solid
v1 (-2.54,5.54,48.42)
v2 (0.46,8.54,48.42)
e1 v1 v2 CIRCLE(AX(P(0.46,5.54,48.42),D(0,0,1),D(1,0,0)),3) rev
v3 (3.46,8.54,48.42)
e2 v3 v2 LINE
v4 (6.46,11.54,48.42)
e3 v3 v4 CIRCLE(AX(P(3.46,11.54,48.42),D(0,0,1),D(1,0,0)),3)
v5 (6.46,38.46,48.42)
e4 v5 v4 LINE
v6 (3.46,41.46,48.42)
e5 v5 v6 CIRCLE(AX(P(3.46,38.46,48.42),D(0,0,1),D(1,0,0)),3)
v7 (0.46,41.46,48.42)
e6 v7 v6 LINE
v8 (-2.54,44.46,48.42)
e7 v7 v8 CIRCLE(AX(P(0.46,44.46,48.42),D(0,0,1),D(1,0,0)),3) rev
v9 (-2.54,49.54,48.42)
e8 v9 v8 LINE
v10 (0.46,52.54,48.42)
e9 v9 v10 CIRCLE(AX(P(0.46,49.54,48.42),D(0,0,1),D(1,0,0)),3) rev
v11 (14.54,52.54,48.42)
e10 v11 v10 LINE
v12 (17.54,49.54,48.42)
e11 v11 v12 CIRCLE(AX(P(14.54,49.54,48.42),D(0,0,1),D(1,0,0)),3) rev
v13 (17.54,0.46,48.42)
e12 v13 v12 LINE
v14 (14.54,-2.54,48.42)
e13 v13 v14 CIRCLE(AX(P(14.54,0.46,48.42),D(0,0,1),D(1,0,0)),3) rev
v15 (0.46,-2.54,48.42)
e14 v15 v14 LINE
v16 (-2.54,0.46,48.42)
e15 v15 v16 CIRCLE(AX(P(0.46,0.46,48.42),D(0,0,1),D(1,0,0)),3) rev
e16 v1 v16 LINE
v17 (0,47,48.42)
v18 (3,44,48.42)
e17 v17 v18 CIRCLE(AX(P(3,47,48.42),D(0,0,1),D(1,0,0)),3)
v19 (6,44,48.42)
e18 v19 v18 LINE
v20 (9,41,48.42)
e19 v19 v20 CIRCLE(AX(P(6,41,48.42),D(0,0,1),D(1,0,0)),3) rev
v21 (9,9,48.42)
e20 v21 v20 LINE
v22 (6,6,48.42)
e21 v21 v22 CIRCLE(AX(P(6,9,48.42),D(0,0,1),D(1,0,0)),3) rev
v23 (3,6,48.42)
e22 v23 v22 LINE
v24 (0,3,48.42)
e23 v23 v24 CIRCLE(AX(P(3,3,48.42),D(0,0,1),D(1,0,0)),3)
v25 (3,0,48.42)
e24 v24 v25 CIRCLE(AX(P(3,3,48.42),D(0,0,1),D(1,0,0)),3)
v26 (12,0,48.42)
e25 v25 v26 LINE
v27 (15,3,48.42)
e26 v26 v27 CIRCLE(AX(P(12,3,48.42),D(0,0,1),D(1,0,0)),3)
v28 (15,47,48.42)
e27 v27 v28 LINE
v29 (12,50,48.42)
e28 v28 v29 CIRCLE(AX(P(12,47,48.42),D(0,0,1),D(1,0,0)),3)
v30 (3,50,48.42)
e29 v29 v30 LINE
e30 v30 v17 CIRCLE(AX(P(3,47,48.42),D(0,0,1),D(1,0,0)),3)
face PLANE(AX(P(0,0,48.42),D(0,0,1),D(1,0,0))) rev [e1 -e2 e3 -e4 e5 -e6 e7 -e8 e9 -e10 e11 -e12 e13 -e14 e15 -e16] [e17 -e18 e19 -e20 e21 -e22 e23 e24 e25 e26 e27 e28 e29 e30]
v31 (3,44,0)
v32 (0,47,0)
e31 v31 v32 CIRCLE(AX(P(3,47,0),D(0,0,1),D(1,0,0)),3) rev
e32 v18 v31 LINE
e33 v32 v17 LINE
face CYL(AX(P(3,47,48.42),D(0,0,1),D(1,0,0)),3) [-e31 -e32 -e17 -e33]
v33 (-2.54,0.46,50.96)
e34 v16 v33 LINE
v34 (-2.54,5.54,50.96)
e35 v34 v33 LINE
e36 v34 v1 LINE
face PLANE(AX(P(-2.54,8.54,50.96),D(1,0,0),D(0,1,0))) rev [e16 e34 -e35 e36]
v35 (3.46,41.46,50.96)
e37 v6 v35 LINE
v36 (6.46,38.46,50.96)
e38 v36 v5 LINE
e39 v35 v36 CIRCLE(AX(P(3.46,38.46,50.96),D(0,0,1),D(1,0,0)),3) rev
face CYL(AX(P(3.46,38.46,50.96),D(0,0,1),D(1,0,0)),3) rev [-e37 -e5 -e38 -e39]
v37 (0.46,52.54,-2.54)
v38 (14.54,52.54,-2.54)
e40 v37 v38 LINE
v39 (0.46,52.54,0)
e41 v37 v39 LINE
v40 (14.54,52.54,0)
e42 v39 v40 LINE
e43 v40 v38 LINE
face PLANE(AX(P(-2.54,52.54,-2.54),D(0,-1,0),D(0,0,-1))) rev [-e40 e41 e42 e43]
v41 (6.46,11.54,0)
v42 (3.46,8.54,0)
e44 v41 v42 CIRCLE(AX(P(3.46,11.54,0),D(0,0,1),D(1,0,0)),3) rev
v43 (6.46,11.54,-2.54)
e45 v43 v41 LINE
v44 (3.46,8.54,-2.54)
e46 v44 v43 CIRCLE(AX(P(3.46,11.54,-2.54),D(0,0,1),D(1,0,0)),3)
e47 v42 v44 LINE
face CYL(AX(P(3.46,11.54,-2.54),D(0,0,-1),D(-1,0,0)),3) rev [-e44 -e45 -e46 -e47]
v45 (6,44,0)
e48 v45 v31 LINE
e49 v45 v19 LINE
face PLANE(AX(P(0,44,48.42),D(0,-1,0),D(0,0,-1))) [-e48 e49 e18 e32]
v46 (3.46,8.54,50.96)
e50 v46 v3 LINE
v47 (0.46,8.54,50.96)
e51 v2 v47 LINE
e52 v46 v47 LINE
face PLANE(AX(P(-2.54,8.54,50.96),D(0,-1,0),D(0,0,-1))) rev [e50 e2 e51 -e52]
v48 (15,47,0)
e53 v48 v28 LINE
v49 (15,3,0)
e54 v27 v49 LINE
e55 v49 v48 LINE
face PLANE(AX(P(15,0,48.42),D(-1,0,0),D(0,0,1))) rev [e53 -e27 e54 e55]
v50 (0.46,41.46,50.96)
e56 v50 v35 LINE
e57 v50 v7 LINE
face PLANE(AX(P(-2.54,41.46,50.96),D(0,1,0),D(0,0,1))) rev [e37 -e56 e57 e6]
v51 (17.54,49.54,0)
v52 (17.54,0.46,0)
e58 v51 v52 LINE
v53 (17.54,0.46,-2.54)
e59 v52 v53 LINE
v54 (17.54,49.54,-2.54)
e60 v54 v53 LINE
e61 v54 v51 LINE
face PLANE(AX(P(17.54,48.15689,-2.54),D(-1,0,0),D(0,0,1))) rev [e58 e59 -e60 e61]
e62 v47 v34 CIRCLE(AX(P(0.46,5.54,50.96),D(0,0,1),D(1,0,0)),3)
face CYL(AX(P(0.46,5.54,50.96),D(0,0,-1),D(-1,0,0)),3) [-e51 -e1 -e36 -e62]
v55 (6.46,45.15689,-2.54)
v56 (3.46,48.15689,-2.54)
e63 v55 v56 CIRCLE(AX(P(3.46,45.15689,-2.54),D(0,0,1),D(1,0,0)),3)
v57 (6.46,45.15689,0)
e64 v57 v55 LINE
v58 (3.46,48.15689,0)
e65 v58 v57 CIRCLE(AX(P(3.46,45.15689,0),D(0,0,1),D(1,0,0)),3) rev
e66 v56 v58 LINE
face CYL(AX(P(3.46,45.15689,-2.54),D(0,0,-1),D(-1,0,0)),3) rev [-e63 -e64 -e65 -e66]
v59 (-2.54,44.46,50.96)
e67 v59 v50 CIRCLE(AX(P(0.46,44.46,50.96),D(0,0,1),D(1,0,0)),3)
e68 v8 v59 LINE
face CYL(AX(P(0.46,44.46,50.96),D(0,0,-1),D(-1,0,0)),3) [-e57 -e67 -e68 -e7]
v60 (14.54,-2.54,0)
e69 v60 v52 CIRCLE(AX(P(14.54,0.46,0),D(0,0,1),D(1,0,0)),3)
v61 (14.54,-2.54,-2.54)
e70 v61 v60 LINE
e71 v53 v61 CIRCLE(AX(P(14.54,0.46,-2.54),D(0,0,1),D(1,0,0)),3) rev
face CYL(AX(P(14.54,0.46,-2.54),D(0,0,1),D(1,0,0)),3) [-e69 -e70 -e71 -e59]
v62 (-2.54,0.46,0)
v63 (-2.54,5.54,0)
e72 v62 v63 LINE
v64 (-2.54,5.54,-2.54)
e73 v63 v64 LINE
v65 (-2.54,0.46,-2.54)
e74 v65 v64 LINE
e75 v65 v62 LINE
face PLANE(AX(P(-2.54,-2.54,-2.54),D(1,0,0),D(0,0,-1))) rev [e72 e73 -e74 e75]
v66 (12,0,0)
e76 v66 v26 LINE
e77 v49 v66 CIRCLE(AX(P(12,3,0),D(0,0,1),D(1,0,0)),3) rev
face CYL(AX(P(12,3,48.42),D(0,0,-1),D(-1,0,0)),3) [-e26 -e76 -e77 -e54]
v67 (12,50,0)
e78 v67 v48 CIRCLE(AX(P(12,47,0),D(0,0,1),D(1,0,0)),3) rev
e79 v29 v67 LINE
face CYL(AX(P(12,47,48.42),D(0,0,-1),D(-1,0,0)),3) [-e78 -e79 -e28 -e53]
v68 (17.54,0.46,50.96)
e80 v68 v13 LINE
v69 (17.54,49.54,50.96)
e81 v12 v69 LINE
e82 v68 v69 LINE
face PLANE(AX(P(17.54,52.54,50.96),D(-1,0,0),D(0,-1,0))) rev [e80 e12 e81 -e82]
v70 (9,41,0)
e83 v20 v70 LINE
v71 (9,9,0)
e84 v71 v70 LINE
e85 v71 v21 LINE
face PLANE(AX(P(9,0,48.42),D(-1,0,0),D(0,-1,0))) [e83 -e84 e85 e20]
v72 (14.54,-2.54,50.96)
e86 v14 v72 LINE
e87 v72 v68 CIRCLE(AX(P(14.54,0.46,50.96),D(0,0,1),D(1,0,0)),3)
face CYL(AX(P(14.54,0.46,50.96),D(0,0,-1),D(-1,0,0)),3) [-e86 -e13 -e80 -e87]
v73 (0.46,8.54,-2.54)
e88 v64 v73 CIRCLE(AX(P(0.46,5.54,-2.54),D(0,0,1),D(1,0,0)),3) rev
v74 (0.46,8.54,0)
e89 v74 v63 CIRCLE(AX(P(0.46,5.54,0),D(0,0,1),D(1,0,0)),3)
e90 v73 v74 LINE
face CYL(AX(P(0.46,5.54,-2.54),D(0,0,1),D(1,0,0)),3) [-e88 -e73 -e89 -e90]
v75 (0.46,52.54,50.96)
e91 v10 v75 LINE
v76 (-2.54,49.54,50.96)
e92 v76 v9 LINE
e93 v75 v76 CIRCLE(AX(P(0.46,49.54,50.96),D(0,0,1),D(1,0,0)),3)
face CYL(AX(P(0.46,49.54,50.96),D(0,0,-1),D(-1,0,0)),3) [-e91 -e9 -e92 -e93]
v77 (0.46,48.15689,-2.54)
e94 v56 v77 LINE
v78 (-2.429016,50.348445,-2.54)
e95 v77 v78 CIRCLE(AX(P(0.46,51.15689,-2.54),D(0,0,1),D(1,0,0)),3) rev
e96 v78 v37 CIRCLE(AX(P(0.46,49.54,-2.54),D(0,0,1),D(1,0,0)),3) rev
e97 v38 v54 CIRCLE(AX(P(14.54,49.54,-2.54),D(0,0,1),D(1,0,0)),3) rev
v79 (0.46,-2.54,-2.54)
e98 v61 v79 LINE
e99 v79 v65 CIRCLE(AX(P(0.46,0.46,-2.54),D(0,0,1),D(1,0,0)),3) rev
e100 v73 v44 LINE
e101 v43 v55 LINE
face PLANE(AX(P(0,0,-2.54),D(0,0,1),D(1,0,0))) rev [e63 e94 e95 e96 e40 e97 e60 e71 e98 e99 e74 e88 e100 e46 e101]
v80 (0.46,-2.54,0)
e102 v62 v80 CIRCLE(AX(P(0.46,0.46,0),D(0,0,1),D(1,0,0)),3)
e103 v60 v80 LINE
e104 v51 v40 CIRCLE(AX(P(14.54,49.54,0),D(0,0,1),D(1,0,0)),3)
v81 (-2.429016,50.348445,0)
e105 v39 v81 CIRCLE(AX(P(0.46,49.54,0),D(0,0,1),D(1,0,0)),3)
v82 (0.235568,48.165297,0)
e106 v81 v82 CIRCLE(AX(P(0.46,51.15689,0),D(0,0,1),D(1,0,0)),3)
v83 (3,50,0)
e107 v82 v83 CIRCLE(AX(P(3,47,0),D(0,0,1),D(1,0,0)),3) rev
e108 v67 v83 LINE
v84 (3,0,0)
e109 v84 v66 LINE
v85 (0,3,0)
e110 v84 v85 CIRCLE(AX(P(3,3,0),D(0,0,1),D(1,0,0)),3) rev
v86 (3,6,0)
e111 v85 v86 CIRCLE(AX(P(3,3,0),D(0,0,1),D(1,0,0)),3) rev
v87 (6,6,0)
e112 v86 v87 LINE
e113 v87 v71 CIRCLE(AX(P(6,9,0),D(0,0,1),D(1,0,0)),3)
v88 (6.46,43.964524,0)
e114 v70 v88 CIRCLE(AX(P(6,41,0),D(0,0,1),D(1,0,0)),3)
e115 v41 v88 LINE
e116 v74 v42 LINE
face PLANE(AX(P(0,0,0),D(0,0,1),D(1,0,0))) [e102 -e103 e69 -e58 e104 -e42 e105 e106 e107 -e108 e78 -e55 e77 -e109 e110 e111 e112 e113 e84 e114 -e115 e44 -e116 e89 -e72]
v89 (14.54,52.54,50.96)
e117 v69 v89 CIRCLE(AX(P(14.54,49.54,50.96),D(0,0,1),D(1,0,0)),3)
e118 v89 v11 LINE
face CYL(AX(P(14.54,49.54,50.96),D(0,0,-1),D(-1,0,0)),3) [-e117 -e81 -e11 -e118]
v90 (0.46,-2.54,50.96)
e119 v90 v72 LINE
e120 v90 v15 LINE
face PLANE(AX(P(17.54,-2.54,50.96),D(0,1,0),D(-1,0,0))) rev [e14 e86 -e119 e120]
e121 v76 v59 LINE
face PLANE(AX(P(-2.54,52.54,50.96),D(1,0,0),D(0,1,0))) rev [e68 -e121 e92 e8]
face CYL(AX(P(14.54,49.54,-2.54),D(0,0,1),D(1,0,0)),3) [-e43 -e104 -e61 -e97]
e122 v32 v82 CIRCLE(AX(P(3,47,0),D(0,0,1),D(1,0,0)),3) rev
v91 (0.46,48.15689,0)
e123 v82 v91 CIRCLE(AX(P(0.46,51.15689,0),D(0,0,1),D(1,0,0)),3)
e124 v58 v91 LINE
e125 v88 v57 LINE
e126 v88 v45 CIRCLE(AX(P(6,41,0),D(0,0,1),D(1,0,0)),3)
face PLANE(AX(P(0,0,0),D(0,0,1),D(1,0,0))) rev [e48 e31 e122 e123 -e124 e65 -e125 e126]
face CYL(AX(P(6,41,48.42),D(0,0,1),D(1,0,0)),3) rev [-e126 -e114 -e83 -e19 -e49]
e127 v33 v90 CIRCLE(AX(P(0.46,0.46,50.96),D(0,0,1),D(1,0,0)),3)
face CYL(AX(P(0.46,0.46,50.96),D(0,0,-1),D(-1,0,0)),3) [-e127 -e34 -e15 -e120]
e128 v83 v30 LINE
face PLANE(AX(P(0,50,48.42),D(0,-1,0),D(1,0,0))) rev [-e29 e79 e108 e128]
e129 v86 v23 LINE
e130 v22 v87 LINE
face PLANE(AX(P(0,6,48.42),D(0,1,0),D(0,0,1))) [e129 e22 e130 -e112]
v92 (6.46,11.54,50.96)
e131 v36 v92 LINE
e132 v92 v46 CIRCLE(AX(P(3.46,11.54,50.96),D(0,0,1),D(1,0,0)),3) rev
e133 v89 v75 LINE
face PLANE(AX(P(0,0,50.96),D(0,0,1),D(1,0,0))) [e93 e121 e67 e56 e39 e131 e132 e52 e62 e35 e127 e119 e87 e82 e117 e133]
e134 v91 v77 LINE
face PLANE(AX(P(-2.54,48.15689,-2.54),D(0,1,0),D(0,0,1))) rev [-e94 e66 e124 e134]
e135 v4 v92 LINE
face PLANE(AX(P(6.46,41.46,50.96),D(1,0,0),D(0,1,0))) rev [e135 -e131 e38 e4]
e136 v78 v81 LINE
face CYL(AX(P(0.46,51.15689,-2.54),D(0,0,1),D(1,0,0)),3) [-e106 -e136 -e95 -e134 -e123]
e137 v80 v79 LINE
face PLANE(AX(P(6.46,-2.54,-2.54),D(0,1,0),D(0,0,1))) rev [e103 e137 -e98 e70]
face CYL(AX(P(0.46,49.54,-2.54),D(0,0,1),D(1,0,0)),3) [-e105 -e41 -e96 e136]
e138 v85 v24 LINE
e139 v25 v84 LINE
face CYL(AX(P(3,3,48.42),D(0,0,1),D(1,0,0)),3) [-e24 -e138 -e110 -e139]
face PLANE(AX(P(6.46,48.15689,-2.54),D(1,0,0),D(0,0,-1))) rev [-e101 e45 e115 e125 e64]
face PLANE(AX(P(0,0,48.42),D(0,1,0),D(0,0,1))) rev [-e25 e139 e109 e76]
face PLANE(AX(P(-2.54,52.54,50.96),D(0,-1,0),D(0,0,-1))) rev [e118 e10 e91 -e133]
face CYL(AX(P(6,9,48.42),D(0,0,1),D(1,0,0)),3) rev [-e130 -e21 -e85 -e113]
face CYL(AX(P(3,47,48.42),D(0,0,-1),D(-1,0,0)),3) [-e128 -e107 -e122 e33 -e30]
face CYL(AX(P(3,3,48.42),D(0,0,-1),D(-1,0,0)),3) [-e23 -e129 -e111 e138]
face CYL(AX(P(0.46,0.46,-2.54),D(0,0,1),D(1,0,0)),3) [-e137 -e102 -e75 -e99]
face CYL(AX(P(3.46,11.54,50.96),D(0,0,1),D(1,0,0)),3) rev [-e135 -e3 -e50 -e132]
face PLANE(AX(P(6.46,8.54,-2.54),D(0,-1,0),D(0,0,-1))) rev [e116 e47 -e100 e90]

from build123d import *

# Parameters (mm, degrees)
BOSS_EXTRUDE1_DEPTH = 48.42
BOSS_EXTRUDE2_DEPTH = 2.54
BOSS_EXTRUDE3_DEPTH = 2.54
FILLET4_R           = 3
FILLET5_R           = 3


with BuildPart() as part:
    # Sketch1 → Boss-Extrude1 (new body)
    with BuildSketch(Plane.XY):
        Polygon((0, 6), (0, 0), (15, 0), (15, 46.604118993), (15, 50), (0, 50), (0, 44), (9, 44), (9, 6), align=None)
    extrude(amount=BOSS_EXTRUDE1_DEPTH)

    # Sketch2 → Boss-Extrude2 (add)
    with BuildSketch(Plane.XY.offset(48.42)):
        Polygon((-2.54, 41.46), (6.46, 41.46), (6.46, 8.54), (-2.54, 8.54), (-2.54, -2.54), (17.54, -2.54), (17.54, 52.54), (-2.54, 52.54), align=None)
    extrude(amount=BOSS_EXTRUDE2_DEPTH)

    # Sketch3 → Boss-Extrude3 (add)
    with BuildSketch(Plane(origin=(0, 0, 0), x_dir=(-1, 0, 0), z_dir=(0, 0, -1))):
        Polygon((2.54, 52.54), (-17.54, 52.54), (-17.54, 48.156890446), (-17.54, -2.54), (-6.46, -2.54), (2.54, -2.54), (2.54, 8.54), (-6.46, 8.54), (-6.46, 48.156890446), (2.54, 48.156890446), align=None)
    extrude(amount=BOSS_EXTRUDE3_DEPTH)

    # Fillet4
    # the kernel refuses this fillet: 3 mm, written as the material it adds along each edge
    with BuildSketch(Plane(origin=(9, 6, -7.5), x_dir=(0, 1, 0), z_dir=(0, 0, 1))) as fillet4_piece_1_section:
        with BuildLine():
            CenterArc((FILLET4_R, FILLET4_R), FILLET4_R, 180, 90)
            Line((0, FILLET4_R), (0, 0))
            Line((0, 0), (FILLET4_R, 0))
        make_face()
    fillet4_piece_1 = extrude(amount=63.42, mode=Mode.PRIVATE)
    fillet4_piece_1 = split(fillet4_piece_1, bisect_by=Plane(origin=(8.329896183, 6.670103817, 50.96), z_dir=(0, 0, -1)), keep=Keep.TOP, mode=Mode.PRIVATE)
    fillet4_piece_1 = split(fillet4_piece_1, bisect_by=Plane(origin=(8.329896183, 6.670103817, -2.54), z_dir=(0, 0, 1)), keep=Keep.TOP, mode=Mode.PRIVATE)
    add(fillet4_piece_1)
    with BuildSketch(Plane(origin=(9, 44, 0), x_dir=(-1, 0, 0), z_dir=(0, 0, 1))) as fillet4_piece_2_section:
        with BuildLine():
            CenterArc((FILLET4_R, FILLET4_R), FILLET4_R, 180, 90)
            Line((0, FILLET4_R), (0, 0))
            Line((0, 0), (FILLET4_R, 0))
        make_face()
    fillet4_piece_2 = extrude(amount=55.92, mode=Mode.PRIVATE)
    fillet4_piece_2 = split(fillet4_piece_2, bisect_by=Plane(origin=(6.34513643, 43.989367947, 50.96), z_dir=(0, 0, -1)), keep=Keep.TOP, mode=Mode.PRIVATE)
    add(fillet4_piece_2)
    # the kernel refuses this fillet: 3 mm, written as the material it takes off along each edge
    with BuildSketch(Plane(origin=(0, 6, 0), x_dir=(0, -1, 0), z_dir=(0, 0, 1)), Plane(origin=(15, 0, 0), x_dir=(0, 1, 0), z_dir=(0, 0, 1)), Plane(origin=(0, 0, 0), x_dir=(1, 0, 0), z_dir=(0, 0, 1)), Plane(origin=(0, 50, 0), x_dir=(0, -1, 0), z_dir=(0, 0, 1))) as fillet4_2_piece_1:
        with BuildLine():
            CenterArc((FILLET4_R, FILLET4_R), FILLET4_R, 180, 90)
            Line((0, FILLET4_R), (0, 0))
            Line((0, 0), (FILLET4_R, 0))
        make_face()
    extrude(amount=48.42, mode=Mode.SUBTRACT)
    with BuildSketch(Plane(origin=(15, 50, 0), x_dir=(0, -1, 0), z_dir=(0, 0, 1))) as fillet4_2_piece_2:
        with BuildLine():
            CenterArc((FILLET4_R, -FILLET4_R), FILLET4_R, 90, 90)
            Line((0, -FILLET4_R), (0, 0))
            Line((0, 0), (FILLET4_R, 0))
        make_face()
    extrude(amount=48.42, mode=Mode.SUBTRACT)
    with BuildSketch(Plane(origin=(0, 44, -7.5), x_dir=(1, 0, 0), z_dir=(0, 0, 1))) as fillet4_2_piece_3:
        with BuildLine():
            CenterArc((FILLET4_R, FILLET4_R), FILLET4_R, 180, 90)
            Line((0, FILLET4_R), (0, 0))
            Line((0, 0), (FILLET4_R, 0))
        make_face()
    extrude(amount=55.92, mode=Mode.SUBTRACT)

    # Fillet5
    # the kernel refuses this fillet: 3 mm, written as the material it adds along each edge
    with BuildSketch(Plane(origin=(6.46, 41.46, 48.42), x_dir=(0, -1, 0), z_dir=(0, 0, 1)), Plane(origin=(6.46, 8.54, 48.42), x_dir=(-1, 0, 0), z_dir=(0, 0, 1)), Plane(origin=(6.46, 8.54, 0), x_dir=(0, 1, 0), z_dir=(0, 0, -1))) as fillet5_piece_1:
        with BuildLine():
            CenterArc((FILLET5_R, -FILLET5_R), FILLET5_R, 90, 90)
            Line((0, -FILLET5_R), (0, 0))
            Line((0, 0), (FILLET5_R, 0))
        make_face()
    extrude(amount=2.54)
    with BuildSketch(Plane(origin=(6.46, 48.156890446, 7.5), x_dir=(0, -1, 0), z_dir=(0, 0, -1))) as fillet5_piece_2:
        with BuildLine():
            CenterArc((FILLET5_R, FILLET5_R), FILLET5_R, 180, 90)
            Line((0, FILLET5_R), (0, 0))
            Line((0, 0), (FILLET5_R, 0))
        make_face()
    extrude(amount=10.04)
    # the kernel refuses this fillet: 3 mm, written as the material it takes off along each edge
    with BuildSketch(Plane(origin=(-2.54, 52.54, 40.92), x_dir=(1, 0, 0), z_dir=(0, 0, 1)), Plane(origin=(-2.54, 8.54, 40.92), x_dir=(1, 0, 0), z_dir=(0, 0, 1)), Plane(origin=(-2.54, -2.54, 40.92), x_dir=(0, 1, 0), z_dir=(0, 0, 1)), Plane(origin=(17.54, -2.54, 40.92), x_dir=(-1, 0, 0), z_dir=(0, 0, 1)), Plane(origin=(17.54, 52.54, 40.92), x_dir=(0, -1, 0), z_dir=(0, 0, 1)), Plane(origin=(-2.54, 52.54, 7.5), x_dir=(0, -1, 0), z_dir=(0, 0, -1)), Plane(origin=(17.54, 52.54, 7.5), x_dir=(-1, 0, 0), z_dir=(0, 0, -1)), Plane(origin=(17.54, -2.54, 7.5), x_dir=(0, 1, 0), z_dir=(0, 0, -1)), Plane(origin=(-2.54, -2.54, 7.5), x_dir=(1, 0, 0), z_dir=(0, 0, -1)), Plane(origin=(-2.54, 8.54, 7.5), x_dir=(0, -1, 0), z_dir=(0, 0, -1))) as fillet5_2_piece_1:
        with BuildLine():
            CenterArc((FILLET5_R, -FILLET5_R), FILLET5_R, 90, 90)
            Line((0, -FILLET5_R), (0, 0))
            Line((0, 0), (FILLET5_R, 0))
        make_face()
    extrude(amount=17.54, mode=Mode.SUBTRACT)
    with BuildSketch(Plane(origin=(-2.54, 41.46, 40.92), x_dir=(1, 0, 0), z_dir=(0, 0, 1))) as fillet5_2_piece_2:
        with BuildLine():
            CenterArc((FILLET5_R, FILLET5_R), FILLET5_R, 180, 90)
            Line((0, FILLET5_R), (0, 0))
            Line((0, 0), (FILLET5_R, 0))
        make_face()
    extrude(amount=17.54, mode=Mode.SUBTRACT)
    with BuildSketch(Plane(origin=(-2.54, 48.156890446, 0), x_dir=(1, 0, 0), z_dir=(0, 0, -1))) as fillet5_2_piece_3:
        with BuildLine():
            CenterArc((FILLET5_R, -FILLET5_R), FILLET5_R, 90, 90)
            Line((0, -FILLET5_R), (0, 0))
            Line((0, 0), (FILLET5_R, 0))
        make_face()
    extrude(amount=10.04, mode=Mode.SUBTRACT)


solid = part.part
